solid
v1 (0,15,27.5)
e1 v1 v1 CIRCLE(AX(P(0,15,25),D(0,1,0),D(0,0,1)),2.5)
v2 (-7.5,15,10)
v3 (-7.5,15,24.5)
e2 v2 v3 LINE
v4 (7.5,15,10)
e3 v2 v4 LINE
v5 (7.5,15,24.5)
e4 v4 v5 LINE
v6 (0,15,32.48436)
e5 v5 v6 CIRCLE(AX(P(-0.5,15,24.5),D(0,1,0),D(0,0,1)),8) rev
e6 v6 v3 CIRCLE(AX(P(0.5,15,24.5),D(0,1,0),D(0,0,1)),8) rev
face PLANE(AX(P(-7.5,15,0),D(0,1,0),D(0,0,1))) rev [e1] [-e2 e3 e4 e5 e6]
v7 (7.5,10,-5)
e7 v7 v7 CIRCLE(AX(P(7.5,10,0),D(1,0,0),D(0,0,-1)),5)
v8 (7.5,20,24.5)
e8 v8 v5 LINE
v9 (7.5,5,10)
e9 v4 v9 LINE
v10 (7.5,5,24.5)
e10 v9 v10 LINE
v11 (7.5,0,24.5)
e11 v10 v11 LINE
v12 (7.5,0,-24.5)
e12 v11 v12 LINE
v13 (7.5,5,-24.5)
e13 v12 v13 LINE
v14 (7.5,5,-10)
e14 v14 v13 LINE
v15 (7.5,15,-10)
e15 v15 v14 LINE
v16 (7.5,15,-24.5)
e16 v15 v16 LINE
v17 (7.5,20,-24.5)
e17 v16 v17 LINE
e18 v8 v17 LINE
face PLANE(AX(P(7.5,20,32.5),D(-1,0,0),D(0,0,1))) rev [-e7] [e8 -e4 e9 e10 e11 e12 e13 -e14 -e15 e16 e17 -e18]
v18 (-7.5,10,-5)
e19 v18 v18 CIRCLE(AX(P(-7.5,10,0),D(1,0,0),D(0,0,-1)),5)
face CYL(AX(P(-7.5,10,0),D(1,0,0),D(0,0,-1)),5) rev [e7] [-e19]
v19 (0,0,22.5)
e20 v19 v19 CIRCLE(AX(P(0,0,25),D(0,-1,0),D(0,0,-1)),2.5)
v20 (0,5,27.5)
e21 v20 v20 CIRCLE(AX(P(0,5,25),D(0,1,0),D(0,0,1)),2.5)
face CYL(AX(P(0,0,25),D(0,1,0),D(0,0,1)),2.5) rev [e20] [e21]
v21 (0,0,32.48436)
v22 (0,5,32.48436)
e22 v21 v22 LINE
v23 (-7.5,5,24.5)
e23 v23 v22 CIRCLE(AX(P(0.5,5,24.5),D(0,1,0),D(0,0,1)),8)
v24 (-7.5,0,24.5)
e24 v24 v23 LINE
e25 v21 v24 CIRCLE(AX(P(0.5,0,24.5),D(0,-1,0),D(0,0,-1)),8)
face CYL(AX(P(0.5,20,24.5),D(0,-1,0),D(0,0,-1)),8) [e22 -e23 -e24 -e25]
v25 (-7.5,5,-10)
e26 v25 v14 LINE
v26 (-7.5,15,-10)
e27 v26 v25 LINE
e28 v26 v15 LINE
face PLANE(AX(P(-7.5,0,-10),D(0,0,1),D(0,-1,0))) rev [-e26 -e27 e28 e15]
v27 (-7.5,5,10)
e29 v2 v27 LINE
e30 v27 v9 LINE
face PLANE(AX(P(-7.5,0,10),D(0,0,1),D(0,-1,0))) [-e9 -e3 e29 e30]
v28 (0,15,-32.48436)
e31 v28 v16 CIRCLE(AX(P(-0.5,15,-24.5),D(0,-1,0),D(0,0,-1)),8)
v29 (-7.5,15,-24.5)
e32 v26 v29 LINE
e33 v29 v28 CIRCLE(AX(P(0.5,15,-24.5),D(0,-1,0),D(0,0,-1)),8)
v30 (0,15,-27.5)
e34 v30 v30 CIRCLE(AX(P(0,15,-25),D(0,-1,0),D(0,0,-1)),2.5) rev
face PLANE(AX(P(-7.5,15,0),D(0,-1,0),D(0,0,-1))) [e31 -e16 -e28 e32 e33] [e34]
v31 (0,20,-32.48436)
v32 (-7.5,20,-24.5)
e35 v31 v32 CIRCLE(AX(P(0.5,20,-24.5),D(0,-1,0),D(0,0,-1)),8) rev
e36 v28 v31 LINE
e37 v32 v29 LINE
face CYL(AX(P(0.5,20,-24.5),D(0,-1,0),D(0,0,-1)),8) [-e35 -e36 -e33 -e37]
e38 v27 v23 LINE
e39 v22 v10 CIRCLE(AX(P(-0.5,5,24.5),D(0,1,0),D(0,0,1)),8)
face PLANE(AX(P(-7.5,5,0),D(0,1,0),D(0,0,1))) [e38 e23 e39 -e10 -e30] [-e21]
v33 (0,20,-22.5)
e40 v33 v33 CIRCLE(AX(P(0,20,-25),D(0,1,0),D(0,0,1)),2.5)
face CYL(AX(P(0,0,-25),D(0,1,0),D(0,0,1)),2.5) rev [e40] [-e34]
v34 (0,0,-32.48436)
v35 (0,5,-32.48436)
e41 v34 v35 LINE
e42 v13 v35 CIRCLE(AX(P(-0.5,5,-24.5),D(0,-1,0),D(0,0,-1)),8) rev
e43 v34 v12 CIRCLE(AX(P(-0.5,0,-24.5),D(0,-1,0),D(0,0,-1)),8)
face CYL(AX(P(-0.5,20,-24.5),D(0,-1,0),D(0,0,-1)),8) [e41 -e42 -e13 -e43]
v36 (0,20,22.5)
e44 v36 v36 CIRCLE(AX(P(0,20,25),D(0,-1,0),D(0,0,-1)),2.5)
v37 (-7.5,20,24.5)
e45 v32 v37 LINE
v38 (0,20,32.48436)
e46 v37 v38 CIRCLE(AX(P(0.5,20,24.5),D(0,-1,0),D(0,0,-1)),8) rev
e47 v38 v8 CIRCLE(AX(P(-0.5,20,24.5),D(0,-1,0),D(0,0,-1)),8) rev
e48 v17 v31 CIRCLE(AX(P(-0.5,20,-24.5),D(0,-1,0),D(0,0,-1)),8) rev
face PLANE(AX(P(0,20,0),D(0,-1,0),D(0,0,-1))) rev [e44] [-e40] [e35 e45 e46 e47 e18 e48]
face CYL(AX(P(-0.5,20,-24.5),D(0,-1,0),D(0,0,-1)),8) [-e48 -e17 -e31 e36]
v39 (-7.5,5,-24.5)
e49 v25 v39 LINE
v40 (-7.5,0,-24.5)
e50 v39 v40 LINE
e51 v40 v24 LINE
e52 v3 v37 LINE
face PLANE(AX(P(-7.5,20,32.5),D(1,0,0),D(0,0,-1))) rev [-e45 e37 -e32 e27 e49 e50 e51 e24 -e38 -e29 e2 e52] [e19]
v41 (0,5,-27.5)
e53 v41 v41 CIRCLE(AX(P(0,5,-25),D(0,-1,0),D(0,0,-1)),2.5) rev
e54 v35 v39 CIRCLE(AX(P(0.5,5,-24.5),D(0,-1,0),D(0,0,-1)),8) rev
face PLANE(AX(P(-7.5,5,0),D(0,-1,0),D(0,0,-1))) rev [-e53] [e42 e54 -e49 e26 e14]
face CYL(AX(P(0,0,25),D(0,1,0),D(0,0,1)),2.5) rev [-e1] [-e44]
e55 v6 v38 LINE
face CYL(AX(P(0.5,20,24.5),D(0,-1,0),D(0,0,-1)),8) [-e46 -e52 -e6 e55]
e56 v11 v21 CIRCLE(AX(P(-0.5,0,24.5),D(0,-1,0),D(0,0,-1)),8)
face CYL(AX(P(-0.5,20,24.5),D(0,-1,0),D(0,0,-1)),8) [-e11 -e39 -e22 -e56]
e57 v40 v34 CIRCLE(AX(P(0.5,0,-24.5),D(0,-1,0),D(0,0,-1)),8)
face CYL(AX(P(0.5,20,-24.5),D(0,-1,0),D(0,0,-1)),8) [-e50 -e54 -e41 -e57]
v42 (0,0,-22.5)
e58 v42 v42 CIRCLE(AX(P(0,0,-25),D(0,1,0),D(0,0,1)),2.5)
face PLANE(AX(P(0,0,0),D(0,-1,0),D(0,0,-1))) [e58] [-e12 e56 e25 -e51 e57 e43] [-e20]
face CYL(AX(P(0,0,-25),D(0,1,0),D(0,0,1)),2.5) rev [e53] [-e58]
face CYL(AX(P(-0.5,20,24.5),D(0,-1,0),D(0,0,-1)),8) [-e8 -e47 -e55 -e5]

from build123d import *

# Parameters (mm, degrees)
SKETCH1_W           = 15
SKETCH1_H           = 65
BOSS_EXTRUDE1_DEPTH = 20
SKETCH2_R           = 2.5
CUT_EXTRUDE1_DEPTH  = 20
SKETCH6_R           = 5
CUT_EXTRUDE3_DEPTH  = 15
SKETCH7_W           = 22.5
SKETCH7_H           = 5
SKETCH7_H_2         = 10
CUT_EXTRUDE4_DEPTH  = 15
FILLET3_R           = 8


with BuildPart() as part:
    # Sketch1 → Boss-Extrude1 (new body)
    with BuildSketch(Plane(origin=(0, 0, 0), x_dir=(1, 0, 0), z_dir=(0, 1, 0))):
        Rectangle(SKETCH1_W, SKETCH1_H)
    extrude(amount=BOSS_EXTRUDE1_DEPTH)

    # Sketch2 → Cut-Extrude1 (cut)
    with BuildSketch(Plane(origin=(0, 20, 0), x_dir=(1, 0, 0), z_dir=(0, 1, 0))):
        with Locations(Location((0, 25, 0), (0, 0, 270))):
            Circle(SKETCH2_R)
        with Locations(Location((0, -25, 0), (0, 0, 90))):
            Circle(SKETCH2_R)
    extrude(amount=-CUT_EXTRUDE1_DEPTH, mode=Mode.SUBTRACT)

    # Sketch6 → Cut-Extrude3 (cut)
    with BuildSketch(Plane(origin=(7.5, 0, 0), x_dir=(0, 0, -1), z_dir=(1, 0, 0))):
        with Locations((0, 10)):
            Circle(SKETCH6_R)
    extrude(amount=-CUT_EXTRUDE3_DEPTH, mode=Mode.SUBTRACT)

    # Sketch7 → Cut-Extrude4 (cut)
    with BuildSketch(Plane(origin=(7.5, 0, 0), x_dir=(0, 0, -1), z_dir=(1, 0, 0))):
        with Locations((-21.25, 12.5)):
            Rectangle(SKETCH7_W, SKETCH7_H)
        with Locations((-21.25, 7.5)):
            Rectangle(SKETCH7_W, SKETCH7_H)
        with Locations((21.25, 10)):
            Rectangle(SKETCH7_W, SKETCH7_H_2)
    extrude(amount=-CUT_EXTRUDE4_DEPTH, mode=Mode.SUBTRACT)

    # Fillet3
    # the kernel refuses this fillet: 8 mm, written as the material it takes off along each edge
    with BuildSketch(Plane(origin=(-7.5, -20, 32.5), x_dir=(1, 0, 0), z_dir=(0, 1, 0)), Plane(origin=(-7.5, -20, -32.5), x_dir=(0, 0, 1), z_dir=(0, 1, 0)), Plane(origin=(-7.5, -5, -32.5), x_dir=(0, 0, 1), z_dir=(0, 1, 0)), Plane(origin=(7.5, -5, 32.5), x_dir=(0, 0, -1), z_dir=(0, 1, 0))) as fillet3_piece_1:
        with BuildLine():
            CenterArc((FILLET3_R, FILLET3_R), FILLET3_R, 180, 90)
            Line((0, FILLET3_R), (0, 0))
            Line((0, 0), (FILLET3_R, 0))
        make_face()
    extrude(amount=45, mode=Mode.SUBTRACT)
    with BuildSketch(Plane(origin=(7.5, -20, 32.5), x_dir=(-1, 0, 0), z_dir=(0, 1, 0)), Plane(origin=(7.5, -20, -32.5), x_dir=(0, 0, 1), z_dir=(0, 1, 0)), Plane(origin=(7.5, -5, -32.5), x_dir=(0, 0, 1), z_dir=(0, 1, 0)), Plane(origin=(-7.5, -5, 32.5), x_dir=(0, 0, -1), z_dir=(0, 1, 0))) as fillet3_piece_2:
        with BuildLine():
            CenterArc((FILLET3_R, -FILLET3_R), FILLET3_R, 90, 90)
            Line((0, -FILLET3_R), (0, 0))
            Line((0, 0), (FILLET3_R, 0))
        make_face()
    extrude(amount=45, mode=Mode.SUBTRACT)


solid = part.part
